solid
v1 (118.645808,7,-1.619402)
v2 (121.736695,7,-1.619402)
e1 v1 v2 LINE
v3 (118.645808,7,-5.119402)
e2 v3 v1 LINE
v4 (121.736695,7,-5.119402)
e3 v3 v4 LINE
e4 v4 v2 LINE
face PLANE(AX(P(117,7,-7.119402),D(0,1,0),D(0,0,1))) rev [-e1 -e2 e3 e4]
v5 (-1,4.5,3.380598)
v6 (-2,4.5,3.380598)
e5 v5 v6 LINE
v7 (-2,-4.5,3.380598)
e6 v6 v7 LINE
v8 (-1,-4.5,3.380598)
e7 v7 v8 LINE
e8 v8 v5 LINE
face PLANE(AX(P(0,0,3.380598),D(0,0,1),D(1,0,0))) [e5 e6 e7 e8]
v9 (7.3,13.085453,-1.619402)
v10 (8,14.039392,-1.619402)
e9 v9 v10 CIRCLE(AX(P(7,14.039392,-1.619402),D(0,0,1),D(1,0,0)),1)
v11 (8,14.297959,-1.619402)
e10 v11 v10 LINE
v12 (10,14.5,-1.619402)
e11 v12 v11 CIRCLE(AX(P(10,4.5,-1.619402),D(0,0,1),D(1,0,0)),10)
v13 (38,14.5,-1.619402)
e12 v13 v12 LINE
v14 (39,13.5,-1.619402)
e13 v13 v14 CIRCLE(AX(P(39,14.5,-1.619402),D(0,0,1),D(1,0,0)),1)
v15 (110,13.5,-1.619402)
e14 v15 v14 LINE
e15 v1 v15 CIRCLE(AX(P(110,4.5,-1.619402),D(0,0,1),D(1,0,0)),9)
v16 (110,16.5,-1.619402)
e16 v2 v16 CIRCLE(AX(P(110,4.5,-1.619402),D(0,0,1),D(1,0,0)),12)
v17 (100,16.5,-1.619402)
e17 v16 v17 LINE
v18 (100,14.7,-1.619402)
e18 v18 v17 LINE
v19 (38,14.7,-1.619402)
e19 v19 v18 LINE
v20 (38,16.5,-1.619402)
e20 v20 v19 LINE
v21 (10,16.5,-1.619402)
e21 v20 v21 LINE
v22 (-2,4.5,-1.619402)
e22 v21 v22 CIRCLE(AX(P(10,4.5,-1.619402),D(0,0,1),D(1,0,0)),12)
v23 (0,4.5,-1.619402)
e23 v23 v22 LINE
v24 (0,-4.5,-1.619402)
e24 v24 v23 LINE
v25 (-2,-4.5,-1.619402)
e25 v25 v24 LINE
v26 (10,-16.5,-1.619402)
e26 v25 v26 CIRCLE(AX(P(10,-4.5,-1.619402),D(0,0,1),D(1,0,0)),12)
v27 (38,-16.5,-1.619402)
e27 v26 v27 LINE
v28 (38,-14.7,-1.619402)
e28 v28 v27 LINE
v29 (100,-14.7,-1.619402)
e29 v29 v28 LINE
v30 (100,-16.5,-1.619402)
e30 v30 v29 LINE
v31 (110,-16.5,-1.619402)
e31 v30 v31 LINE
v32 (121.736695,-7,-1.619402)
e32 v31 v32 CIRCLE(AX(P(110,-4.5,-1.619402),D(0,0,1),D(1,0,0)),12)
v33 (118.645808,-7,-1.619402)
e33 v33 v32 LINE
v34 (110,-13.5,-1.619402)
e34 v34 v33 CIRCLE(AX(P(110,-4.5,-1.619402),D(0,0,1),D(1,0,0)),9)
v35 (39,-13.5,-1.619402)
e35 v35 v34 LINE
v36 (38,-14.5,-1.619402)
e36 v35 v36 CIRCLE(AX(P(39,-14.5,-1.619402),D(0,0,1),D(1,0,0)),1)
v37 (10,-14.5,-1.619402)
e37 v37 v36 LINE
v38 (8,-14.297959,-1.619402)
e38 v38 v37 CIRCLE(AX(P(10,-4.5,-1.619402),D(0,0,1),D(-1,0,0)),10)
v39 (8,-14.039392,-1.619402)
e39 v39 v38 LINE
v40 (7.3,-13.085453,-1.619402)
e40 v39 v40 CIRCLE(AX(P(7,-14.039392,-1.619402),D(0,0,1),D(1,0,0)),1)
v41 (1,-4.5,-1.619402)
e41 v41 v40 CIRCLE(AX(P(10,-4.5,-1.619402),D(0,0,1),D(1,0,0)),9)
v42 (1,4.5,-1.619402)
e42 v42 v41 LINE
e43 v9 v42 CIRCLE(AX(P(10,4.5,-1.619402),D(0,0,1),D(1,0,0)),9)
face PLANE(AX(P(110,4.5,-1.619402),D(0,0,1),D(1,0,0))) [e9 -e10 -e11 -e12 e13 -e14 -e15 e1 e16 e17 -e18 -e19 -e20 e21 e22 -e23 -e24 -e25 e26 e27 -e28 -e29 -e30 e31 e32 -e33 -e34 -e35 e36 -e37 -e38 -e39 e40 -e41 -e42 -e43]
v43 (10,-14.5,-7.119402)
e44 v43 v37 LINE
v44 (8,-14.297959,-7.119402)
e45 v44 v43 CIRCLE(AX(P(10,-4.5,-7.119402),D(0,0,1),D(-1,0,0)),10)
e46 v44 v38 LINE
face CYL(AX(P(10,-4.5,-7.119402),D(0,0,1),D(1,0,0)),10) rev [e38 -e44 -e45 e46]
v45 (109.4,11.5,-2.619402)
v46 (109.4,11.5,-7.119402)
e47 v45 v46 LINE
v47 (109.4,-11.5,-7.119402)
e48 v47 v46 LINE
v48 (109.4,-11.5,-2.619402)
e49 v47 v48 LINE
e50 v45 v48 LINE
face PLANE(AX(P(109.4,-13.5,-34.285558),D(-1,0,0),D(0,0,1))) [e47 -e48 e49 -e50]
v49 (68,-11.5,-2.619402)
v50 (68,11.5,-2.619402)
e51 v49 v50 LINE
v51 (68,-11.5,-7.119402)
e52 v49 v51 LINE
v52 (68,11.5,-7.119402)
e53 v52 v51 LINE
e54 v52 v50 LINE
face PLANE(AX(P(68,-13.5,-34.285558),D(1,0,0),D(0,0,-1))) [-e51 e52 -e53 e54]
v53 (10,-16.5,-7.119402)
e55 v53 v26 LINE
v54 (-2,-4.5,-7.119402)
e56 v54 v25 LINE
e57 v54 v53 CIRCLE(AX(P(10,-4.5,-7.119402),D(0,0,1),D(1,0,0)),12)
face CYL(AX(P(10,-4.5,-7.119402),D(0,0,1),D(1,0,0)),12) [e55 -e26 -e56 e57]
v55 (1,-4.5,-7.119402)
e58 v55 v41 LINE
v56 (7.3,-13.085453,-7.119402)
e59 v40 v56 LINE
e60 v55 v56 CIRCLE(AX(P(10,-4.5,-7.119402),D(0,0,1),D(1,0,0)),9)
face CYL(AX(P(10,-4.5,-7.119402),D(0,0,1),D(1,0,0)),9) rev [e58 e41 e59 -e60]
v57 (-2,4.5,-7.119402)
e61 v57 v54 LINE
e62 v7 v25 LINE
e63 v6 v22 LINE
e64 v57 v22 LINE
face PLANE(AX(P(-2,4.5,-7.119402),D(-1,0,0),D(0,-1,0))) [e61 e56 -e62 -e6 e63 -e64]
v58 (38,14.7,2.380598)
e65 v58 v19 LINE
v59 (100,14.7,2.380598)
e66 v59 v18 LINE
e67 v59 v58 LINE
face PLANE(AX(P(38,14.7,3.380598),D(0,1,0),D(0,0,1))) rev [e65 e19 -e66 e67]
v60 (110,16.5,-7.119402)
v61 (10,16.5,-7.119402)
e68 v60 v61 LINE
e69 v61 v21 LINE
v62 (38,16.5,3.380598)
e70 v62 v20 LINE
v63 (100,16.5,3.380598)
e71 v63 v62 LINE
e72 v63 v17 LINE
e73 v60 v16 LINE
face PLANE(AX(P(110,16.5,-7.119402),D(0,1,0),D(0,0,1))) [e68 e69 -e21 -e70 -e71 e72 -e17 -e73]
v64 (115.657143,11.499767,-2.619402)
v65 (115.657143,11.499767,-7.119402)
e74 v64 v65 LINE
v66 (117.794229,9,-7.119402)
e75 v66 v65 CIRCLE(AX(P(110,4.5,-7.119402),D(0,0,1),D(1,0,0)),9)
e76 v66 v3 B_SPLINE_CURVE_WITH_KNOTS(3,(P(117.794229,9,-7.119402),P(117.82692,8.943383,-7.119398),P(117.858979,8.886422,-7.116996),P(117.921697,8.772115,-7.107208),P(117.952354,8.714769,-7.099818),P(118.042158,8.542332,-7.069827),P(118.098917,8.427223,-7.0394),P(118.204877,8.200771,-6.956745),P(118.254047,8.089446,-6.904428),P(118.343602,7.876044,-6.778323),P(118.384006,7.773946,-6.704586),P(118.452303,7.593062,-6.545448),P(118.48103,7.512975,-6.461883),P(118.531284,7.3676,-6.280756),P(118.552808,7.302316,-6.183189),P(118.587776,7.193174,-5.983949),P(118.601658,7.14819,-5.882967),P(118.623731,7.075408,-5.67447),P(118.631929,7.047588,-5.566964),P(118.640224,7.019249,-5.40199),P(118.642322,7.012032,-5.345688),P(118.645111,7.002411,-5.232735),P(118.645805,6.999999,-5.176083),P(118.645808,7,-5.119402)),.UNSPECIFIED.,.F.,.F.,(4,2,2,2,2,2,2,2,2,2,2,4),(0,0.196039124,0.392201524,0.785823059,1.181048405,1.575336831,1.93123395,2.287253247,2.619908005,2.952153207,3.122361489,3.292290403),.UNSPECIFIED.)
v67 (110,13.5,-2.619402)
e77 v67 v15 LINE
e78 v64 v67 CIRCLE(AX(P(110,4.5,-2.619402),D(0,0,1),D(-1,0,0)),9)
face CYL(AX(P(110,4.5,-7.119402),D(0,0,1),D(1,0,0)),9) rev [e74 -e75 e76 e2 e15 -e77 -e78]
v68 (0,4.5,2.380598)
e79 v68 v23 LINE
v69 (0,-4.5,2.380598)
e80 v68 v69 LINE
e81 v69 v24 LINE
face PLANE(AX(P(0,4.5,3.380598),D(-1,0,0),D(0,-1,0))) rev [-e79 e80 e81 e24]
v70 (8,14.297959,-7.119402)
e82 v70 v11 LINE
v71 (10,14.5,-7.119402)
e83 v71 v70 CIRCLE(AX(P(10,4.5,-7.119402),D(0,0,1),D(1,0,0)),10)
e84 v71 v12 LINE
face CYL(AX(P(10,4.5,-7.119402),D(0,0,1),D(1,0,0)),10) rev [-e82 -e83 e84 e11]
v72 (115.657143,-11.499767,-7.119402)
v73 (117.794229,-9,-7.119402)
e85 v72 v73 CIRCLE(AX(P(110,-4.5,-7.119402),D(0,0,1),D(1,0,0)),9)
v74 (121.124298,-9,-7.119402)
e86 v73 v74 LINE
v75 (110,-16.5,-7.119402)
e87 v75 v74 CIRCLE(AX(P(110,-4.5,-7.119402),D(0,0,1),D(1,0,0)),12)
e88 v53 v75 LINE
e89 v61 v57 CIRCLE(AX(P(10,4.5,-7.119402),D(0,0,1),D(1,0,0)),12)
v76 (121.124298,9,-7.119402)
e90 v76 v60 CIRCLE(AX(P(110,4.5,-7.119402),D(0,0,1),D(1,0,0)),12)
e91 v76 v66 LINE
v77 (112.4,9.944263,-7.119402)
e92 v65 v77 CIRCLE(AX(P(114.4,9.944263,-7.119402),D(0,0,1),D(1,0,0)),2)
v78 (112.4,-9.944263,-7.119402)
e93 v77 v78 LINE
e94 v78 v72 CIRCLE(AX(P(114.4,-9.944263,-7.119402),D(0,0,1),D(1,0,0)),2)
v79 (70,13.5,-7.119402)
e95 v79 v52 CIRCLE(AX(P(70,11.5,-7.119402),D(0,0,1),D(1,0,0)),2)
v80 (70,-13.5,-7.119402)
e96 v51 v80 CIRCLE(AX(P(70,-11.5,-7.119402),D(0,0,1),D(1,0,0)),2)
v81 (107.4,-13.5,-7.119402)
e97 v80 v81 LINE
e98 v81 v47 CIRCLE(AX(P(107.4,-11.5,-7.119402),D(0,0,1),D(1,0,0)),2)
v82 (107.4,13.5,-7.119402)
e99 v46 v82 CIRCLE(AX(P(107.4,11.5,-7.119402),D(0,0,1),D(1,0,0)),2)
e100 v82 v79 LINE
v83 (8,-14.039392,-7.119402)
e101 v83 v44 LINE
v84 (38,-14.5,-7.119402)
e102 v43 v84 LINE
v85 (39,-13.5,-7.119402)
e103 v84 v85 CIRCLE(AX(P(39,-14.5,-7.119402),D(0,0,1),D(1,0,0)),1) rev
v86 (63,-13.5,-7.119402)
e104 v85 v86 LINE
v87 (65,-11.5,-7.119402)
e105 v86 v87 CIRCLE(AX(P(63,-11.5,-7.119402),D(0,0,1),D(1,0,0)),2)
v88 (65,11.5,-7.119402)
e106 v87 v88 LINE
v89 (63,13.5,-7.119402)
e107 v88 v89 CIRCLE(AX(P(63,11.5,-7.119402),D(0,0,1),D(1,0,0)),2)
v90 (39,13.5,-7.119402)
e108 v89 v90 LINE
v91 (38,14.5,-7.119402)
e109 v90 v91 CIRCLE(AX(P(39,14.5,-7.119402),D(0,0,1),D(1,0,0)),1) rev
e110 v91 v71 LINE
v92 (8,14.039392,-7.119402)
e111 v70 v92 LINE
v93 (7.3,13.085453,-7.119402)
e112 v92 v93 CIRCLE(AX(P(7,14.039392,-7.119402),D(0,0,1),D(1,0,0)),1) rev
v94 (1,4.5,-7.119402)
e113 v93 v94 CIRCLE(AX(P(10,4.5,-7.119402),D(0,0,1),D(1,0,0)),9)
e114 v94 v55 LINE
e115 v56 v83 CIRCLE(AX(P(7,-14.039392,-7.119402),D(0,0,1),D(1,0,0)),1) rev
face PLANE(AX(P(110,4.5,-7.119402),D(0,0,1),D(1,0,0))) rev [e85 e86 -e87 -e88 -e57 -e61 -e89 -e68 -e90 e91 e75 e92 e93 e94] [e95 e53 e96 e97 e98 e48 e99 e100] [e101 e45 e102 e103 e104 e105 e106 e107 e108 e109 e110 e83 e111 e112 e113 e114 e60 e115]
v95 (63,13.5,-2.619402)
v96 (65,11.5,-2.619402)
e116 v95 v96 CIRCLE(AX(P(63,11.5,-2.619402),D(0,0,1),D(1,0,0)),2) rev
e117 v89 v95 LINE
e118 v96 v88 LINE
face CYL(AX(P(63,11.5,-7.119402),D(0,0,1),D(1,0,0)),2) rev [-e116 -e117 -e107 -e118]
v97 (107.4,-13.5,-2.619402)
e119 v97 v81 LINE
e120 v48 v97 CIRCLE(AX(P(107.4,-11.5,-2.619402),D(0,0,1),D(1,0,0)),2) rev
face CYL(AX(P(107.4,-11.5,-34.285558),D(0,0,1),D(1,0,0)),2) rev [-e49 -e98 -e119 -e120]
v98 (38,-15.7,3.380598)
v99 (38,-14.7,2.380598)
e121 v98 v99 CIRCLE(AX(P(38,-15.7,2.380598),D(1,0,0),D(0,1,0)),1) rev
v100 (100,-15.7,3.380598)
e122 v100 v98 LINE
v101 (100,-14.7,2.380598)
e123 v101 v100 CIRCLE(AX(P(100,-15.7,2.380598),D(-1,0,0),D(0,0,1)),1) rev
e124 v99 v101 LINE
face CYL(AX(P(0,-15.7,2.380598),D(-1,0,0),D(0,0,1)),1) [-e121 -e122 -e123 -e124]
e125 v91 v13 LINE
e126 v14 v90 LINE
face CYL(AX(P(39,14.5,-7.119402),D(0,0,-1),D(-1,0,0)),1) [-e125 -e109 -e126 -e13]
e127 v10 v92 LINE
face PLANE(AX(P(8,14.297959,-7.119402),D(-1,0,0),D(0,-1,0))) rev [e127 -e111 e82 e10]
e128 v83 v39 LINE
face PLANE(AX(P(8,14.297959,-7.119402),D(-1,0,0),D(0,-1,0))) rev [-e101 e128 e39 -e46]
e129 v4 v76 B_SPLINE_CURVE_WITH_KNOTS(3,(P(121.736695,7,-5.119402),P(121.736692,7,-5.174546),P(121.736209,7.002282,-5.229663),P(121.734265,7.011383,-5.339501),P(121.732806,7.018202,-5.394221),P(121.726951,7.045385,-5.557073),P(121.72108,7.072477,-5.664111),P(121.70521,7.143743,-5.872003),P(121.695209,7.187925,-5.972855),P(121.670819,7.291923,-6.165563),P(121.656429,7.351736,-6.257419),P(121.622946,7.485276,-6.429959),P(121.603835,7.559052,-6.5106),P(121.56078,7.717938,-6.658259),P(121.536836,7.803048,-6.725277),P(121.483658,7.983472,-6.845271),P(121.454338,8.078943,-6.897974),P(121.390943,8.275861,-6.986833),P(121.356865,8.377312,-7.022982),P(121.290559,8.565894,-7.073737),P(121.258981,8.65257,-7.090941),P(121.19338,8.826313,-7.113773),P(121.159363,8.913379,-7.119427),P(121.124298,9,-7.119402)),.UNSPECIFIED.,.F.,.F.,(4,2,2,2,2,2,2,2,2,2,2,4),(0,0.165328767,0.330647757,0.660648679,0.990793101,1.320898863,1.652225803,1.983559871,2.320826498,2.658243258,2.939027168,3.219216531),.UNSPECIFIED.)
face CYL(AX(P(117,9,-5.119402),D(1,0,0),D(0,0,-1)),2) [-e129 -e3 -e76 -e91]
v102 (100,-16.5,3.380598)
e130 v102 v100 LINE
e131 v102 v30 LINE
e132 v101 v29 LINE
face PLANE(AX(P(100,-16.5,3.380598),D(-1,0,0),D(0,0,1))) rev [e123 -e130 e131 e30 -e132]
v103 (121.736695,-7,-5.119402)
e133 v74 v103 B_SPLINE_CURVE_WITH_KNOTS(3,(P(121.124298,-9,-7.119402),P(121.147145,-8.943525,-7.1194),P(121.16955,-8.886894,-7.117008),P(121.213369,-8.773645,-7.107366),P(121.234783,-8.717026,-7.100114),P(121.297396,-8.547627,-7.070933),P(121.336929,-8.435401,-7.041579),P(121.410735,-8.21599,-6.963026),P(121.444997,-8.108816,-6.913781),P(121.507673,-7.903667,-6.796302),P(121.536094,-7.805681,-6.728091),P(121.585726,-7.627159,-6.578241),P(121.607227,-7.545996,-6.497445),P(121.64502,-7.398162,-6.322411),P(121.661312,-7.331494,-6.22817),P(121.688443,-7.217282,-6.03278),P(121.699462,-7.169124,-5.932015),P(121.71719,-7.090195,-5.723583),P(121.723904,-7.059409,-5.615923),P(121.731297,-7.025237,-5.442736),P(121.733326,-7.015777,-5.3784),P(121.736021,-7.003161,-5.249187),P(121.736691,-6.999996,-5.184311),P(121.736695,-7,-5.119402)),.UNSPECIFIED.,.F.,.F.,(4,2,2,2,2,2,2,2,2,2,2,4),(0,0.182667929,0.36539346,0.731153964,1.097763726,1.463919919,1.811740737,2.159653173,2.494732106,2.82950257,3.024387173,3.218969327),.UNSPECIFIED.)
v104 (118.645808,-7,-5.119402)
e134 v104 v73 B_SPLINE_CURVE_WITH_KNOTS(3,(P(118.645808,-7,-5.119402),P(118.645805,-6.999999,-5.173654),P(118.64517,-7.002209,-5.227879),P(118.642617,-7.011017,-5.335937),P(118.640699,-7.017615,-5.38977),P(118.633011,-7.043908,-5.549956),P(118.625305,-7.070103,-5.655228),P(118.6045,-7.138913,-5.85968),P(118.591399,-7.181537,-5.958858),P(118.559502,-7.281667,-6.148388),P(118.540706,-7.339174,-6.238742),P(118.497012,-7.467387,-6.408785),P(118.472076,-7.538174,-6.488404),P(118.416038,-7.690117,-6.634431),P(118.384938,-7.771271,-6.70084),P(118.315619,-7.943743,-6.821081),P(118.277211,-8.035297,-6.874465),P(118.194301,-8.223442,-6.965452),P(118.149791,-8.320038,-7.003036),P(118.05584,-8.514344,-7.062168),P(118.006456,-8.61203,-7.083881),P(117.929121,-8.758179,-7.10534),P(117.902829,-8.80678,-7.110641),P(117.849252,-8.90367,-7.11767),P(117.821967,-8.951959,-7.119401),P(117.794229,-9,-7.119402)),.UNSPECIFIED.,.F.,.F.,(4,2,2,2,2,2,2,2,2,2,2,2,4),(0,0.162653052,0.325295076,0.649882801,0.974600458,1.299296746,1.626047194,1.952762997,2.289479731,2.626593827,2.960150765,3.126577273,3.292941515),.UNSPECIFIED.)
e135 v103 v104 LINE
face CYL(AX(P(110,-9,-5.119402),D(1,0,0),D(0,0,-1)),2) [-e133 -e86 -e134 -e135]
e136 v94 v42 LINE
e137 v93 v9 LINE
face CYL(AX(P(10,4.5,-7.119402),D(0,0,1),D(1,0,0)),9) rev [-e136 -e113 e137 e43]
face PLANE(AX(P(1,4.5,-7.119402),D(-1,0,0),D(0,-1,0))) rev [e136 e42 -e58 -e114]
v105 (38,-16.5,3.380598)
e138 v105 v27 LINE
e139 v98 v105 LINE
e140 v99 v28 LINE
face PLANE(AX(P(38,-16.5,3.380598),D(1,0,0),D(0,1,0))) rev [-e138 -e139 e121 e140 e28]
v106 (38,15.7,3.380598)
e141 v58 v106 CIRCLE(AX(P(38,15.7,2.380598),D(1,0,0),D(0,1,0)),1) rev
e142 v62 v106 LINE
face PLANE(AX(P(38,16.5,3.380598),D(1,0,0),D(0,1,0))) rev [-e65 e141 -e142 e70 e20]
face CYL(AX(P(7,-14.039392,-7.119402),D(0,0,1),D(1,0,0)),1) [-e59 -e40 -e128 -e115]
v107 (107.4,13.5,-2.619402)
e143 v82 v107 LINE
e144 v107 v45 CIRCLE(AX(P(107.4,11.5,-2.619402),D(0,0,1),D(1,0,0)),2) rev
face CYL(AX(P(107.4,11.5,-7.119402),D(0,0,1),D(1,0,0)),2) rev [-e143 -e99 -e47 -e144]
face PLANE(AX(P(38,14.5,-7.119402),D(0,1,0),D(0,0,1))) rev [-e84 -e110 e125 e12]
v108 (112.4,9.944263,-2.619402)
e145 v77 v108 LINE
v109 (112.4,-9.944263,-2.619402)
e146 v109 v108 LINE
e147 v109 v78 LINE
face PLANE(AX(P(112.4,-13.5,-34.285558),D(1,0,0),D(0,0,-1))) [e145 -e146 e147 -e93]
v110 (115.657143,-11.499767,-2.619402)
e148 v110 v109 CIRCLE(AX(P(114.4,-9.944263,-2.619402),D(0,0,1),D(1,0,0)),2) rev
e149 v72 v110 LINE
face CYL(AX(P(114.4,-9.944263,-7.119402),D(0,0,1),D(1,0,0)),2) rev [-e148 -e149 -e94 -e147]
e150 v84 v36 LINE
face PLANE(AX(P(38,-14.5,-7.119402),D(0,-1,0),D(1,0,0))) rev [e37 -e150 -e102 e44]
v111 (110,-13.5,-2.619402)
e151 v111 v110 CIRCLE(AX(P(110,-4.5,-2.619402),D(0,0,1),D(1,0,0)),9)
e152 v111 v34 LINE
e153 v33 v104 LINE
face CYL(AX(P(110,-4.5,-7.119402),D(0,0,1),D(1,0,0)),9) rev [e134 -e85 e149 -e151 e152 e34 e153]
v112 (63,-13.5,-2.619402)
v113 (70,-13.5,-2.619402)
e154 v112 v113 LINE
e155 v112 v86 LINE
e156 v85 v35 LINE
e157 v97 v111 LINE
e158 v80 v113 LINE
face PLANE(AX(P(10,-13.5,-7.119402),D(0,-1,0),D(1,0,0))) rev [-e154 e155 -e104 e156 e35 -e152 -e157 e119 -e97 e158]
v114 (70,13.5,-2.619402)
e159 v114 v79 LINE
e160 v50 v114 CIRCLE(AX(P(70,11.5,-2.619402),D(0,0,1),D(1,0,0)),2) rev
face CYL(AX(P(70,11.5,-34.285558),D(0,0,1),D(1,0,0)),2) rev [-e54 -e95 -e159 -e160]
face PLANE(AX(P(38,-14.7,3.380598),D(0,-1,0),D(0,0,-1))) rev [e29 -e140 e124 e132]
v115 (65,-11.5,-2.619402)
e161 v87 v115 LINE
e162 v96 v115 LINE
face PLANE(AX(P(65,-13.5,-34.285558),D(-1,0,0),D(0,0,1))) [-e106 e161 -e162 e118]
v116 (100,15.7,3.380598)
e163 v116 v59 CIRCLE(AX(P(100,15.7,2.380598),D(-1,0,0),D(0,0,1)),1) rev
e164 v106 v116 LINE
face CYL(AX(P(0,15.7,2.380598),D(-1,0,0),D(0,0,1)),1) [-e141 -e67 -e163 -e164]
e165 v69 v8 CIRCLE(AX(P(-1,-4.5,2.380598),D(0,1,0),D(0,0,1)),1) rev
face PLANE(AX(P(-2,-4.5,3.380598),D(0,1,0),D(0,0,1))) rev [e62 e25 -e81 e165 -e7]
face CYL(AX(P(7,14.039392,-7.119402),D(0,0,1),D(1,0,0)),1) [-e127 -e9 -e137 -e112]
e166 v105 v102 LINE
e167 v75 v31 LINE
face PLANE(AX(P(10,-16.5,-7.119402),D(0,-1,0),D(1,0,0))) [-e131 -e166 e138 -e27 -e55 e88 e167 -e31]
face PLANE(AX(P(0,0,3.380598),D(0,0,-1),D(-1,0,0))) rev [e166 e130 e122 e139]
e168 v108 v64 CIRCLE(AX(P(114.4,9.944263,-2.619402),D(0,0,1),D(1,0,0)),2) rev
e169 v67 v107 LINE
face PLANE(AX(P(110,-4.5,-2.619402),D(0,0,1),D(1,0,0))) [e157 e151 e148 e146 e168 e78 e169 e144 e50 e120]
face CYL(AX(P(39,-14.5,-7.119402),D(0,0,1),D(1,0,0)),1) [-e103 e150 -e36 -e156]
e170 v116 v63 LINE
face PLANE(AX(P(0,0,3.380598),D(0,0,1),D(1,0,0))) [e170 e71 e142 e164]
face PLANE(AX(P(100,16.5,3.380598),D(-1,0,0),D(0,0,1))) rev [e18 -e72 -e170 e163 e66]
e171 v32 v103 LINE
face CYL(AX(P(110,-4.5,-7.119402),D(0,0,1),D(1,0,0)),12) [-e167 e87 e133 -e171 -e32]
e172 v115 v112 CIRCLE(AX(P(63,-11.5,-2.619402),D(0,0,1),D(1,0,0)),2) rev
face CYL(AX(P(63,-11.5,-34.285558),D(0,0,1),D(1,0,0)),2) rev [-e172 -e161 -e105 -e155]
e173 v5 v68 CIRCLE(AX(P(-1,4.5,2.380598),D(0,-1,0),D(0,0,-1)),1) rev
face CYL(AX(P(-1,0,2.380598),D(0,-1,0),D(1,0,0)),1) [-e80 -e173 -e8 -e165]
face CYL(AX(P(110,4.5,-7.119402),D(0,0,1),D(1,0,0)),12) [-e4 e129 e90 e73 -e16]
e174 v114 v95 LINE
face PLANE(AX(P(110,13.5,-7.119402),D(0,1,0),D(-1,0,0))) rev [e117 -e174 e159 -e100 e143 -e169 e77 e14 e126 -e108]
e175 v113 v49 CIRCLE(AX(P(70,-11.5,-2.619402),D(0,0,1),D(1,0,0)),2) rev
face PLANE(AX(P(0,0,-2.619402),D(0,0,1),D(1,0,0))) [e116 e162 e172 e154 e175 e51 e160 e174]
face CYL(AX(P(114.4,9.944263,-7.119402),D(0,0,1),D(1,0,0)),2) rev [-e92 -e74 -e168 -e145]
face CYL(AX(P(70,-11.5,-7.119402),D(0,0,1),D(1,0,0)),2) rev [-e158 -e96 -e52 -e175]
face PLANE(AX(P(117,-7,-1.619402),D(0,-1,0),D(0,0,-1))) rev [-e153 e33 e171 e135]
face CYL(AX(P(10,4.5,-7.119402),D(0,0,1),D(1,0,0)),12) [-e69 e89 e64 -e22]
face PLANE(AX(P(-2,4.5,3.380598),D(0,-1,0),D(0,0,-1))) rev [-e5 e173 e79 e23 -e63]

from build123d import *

# Parameters (mm, degrees)
BOSS_EXTRUDE2_DEPTH                    = 5.5
SKETCH4_W                              = 3
SKETCH4_H                              = 27
BOSS_EXTRUDE4_CROSS_STRUCTURES_DEPTH   = 5.5
SKETCH6_W                              = 3
SKETCH6_H                              = 27
CUT_EXTRUDE3_1_MM_SPACING_DEPTH        = 1
CUT_EXTRUDE4_ELECTRONICS_SPACING_DEPTH = 124.233518168
SKETCH8_W                              = 5.5
SKETCH8_H                              = 14
CUT_EXTRUDE2_USB_C_CUTOUT_DEPTH        = 5
FILLET2_USBC_R                         = 2
FILLET3_INNER_CORNERS_FRONT_R          = 1
FILLET5_INNER_CORNERS_R                = 2
SKETCH18_W                             = 62
SKETCH18_H                             = 1.8
SKETCH18_W_2                           = 2
SKETCH18_H_2                           = 9
BOSS_EXTRUDE7_DEPTH                    = 5
FILLET1_R                              = 1


with BuildPart() as part:
    # Sketch3 → Boss-Extrude2 (new body)
    with BuildSketch(Plane.XY.offset(-1.6194024)):
        with BuildLine():
            Line((110, 16.5), (10, 16.5))
            ThreePointArc((10, 16.5), (1.514718626, 12.985281374), (-2, 4.5))
            Line((-2, 4.5), (-2, -4.5))
            ThreePointArc((-2, -4.5), (1.514718626, -12.985281374), (10, -16.5))
            Line((10, -16.5), (110, -16.5))
            ThreePointArc((110, -16.5), (118.485281374, -12.985281374), (122, -4.5))
            Line((122, -4.5), (122, 4.5))
            ThreePointArc((122, 4.5), (118.485281374, 12.985281374), (110, 16.5))
        make_face()
        with BuildLine():
            Line((119, -4.5), (119, 4.5))
            ThreePointArc((119, 4.5), (116.363961031, 10.863961031), (110, 13.5))
            Line((110, 13.5), (10, 13.5))
            ThreePointArc((10, 13.5), (3.636038969, 10.863961031), (1, 4.5))
            Line((1, 4.5), (1, -4.5))
            ThreePointArc((1, -4.5), (3.636038969, -10.863961031), (10, -13.5))
            Line((10, -13.5), (110, -13.5))
            ThreePointArc((110, -13.5), (116.363961031, -10.863961031), (119, -4.5))
        make_face(mode=Mode.SUBTRACT)
    extrude(amount=-BOSS_EXTRUDE2_DEPTH)

    # Sketch4 → Boss-Extrude4 - cross structures (add)
    with BuildSketch(Plane.XY.offset(-1.6194024)):
        with Locations((110.9, 0)):
            Rectangle(SKETCH4_W, SKETCH4_H)
        with Locations((66.5, 0)):
            Rectangle(SKETCH4_W, SKETCH4_H)
    extrude(amount=-BOSS_EXTRUDE4_CROSS_STRUCTURES_DEPTH)

    # Sketch6 → Cut-Extrude3 - 1 mm spacing (cut)
    with BuildSketch(Plane.XY.offset(-1.6194024)):
        with BuildLine():
            Line((109.4, 13.5), (110, 13.5))
            ThreePointArc((110, 13.5), (111.211013131, 13.418152678), (112.4, 13.174099377))
            Line((112.4, 13.174099377), (112.4, -13.174099377))
            ThreePointArc((112.4, -13.174099377), (111.211013131, -13.418152678), (110, -13.5))
            Line((110, -13.5), (109.4, -13.5))
            Line((109.4, -13.5), (109.4, 13.5))
        make_face()
        with Locations((66.5, 0)):
            Rectangle(SKETCH6_W, SKETCH6_H)
    extrude(amount=-CUT_EXTRUDE3_1_MM_SPACING_DEPTH, mode=Mode.SUBTRACT)

    # Sketch7 → Cut-Extrude4 - electronics spacing (cut, through all)
    with BuildSketch(Plane.XY.offset(-1.6194024)):
        with BuildLine():
            Line((38, -14.5), (10, -14.5))
            ThreePointArc((10, -14.5), (8.99491038, -14.44936153), (8, -14.297958971))
            Line((8, -14.297958971), (8, 14.297958971))
            ThreePointArc((8, 14.297958971), (8.99491038, 14.44936153), (10, 14.5))
            Line((10, 14.5), (38, 14.5))
            Line((38, 14.5), (38, -14.5))
        make_face()
    extrude(amount=-CUT_EXTRUDE4_ELECTRONICS_SPACING_DEPTH, mode=Mode.SUBTRACT)

    # Sketch8 → Cut-Extrude2 - USB-C cutout (cut)
    with BuildSketch(Plane(origin=(122, 0, 0), x_dir=(0, 0, -1), z_dir=(1, 0, 0))):
        with Locations((4.3694024, 0)):
            Rectangle(SKETCH8_W, SKETCH8_H)
    extrude(amount=-CUT_EXTRUDE2_USB_C_CUTOUT_DEPTH, mode=Mode.SUBTRACT)

    # Fillet2 - USBC
    fillet2_usbc_edges = [part.edges().sort_by_distance(p)[0] for p in [
        (120.191251414, 7, -7.1194024),
        (120.191251414, -7, -7.1194024),
    ]]
    fillet(fillet2_usbc_edges, radius=FILLET2_USBC_R)

    # Fillet3 - inner corners, front
    fillet3_inner_corners_front_edges = [part.edges().sort_by_distance(p)[0] for p in [
        (38, 13.5, -4.3694024),
        (38, -13.5, -4.3694024),
        (8, -13.274964387, -4.3694024),
        (8, 13.274964387, -4.3694024),
    ]]
    fillet(fillet3_inner_corners_front_edges, radius=FILLET3_INNER_CORNERS_FRONT_R - 0.0001)  # a hair under: the kernel refuses the full size

    # Fillet5 - inner corners
    fillet5_inner_corners_edges = [part.edges().sort_by_distance(p)[0] for p in [
        (112.4, -13.174099377, -4.8694024),
        (109.4, -13.5, -4.8694024),
        (109.4, 13.5, -4.8694024),
        (65, -13.5, -4.8694024),
        (65, 13.5, -4.8694024),
        (68, 13.5, -4.8694024),
        (68, -13.5, -4.8694024),
        (112.4, 13.174099377, -4.8694024),
    ]]
    fillet(fillet5_inner_corners_edges, radius=FILLET5_INNER_CORNERS_R)

    # Sketch18 → Boss-Extrude7 (add)
    with BuildSketch(Plane.XY.offset(-1.6194024)):
        with Locations((69, 15.6)):
            Rectangle(SKETCH18_W, SKETCH18_H)
        with Locations((69, -15.6)):
            Rectangle(SKETCH18_W, SKETCH18_H)
        with Locations((-1, 0)):
            Rectangle(SKETCH18_W_2, SKETCH18_H_2)
    extrude(amount=BOSS_EXTRUDE7_DEPTH)

    # Fillet1
    fillet1_edges = [part.edges().sort_by_distance(p)[0] for p in [
        (69, 14.7, 3.3805976),
        (69, -14.7, 3.3805976),
        (0, 0, 3.3805976),
    ]]
    fillet(fillet1_edges, radius=FILLET1_R)


solid = part.part
